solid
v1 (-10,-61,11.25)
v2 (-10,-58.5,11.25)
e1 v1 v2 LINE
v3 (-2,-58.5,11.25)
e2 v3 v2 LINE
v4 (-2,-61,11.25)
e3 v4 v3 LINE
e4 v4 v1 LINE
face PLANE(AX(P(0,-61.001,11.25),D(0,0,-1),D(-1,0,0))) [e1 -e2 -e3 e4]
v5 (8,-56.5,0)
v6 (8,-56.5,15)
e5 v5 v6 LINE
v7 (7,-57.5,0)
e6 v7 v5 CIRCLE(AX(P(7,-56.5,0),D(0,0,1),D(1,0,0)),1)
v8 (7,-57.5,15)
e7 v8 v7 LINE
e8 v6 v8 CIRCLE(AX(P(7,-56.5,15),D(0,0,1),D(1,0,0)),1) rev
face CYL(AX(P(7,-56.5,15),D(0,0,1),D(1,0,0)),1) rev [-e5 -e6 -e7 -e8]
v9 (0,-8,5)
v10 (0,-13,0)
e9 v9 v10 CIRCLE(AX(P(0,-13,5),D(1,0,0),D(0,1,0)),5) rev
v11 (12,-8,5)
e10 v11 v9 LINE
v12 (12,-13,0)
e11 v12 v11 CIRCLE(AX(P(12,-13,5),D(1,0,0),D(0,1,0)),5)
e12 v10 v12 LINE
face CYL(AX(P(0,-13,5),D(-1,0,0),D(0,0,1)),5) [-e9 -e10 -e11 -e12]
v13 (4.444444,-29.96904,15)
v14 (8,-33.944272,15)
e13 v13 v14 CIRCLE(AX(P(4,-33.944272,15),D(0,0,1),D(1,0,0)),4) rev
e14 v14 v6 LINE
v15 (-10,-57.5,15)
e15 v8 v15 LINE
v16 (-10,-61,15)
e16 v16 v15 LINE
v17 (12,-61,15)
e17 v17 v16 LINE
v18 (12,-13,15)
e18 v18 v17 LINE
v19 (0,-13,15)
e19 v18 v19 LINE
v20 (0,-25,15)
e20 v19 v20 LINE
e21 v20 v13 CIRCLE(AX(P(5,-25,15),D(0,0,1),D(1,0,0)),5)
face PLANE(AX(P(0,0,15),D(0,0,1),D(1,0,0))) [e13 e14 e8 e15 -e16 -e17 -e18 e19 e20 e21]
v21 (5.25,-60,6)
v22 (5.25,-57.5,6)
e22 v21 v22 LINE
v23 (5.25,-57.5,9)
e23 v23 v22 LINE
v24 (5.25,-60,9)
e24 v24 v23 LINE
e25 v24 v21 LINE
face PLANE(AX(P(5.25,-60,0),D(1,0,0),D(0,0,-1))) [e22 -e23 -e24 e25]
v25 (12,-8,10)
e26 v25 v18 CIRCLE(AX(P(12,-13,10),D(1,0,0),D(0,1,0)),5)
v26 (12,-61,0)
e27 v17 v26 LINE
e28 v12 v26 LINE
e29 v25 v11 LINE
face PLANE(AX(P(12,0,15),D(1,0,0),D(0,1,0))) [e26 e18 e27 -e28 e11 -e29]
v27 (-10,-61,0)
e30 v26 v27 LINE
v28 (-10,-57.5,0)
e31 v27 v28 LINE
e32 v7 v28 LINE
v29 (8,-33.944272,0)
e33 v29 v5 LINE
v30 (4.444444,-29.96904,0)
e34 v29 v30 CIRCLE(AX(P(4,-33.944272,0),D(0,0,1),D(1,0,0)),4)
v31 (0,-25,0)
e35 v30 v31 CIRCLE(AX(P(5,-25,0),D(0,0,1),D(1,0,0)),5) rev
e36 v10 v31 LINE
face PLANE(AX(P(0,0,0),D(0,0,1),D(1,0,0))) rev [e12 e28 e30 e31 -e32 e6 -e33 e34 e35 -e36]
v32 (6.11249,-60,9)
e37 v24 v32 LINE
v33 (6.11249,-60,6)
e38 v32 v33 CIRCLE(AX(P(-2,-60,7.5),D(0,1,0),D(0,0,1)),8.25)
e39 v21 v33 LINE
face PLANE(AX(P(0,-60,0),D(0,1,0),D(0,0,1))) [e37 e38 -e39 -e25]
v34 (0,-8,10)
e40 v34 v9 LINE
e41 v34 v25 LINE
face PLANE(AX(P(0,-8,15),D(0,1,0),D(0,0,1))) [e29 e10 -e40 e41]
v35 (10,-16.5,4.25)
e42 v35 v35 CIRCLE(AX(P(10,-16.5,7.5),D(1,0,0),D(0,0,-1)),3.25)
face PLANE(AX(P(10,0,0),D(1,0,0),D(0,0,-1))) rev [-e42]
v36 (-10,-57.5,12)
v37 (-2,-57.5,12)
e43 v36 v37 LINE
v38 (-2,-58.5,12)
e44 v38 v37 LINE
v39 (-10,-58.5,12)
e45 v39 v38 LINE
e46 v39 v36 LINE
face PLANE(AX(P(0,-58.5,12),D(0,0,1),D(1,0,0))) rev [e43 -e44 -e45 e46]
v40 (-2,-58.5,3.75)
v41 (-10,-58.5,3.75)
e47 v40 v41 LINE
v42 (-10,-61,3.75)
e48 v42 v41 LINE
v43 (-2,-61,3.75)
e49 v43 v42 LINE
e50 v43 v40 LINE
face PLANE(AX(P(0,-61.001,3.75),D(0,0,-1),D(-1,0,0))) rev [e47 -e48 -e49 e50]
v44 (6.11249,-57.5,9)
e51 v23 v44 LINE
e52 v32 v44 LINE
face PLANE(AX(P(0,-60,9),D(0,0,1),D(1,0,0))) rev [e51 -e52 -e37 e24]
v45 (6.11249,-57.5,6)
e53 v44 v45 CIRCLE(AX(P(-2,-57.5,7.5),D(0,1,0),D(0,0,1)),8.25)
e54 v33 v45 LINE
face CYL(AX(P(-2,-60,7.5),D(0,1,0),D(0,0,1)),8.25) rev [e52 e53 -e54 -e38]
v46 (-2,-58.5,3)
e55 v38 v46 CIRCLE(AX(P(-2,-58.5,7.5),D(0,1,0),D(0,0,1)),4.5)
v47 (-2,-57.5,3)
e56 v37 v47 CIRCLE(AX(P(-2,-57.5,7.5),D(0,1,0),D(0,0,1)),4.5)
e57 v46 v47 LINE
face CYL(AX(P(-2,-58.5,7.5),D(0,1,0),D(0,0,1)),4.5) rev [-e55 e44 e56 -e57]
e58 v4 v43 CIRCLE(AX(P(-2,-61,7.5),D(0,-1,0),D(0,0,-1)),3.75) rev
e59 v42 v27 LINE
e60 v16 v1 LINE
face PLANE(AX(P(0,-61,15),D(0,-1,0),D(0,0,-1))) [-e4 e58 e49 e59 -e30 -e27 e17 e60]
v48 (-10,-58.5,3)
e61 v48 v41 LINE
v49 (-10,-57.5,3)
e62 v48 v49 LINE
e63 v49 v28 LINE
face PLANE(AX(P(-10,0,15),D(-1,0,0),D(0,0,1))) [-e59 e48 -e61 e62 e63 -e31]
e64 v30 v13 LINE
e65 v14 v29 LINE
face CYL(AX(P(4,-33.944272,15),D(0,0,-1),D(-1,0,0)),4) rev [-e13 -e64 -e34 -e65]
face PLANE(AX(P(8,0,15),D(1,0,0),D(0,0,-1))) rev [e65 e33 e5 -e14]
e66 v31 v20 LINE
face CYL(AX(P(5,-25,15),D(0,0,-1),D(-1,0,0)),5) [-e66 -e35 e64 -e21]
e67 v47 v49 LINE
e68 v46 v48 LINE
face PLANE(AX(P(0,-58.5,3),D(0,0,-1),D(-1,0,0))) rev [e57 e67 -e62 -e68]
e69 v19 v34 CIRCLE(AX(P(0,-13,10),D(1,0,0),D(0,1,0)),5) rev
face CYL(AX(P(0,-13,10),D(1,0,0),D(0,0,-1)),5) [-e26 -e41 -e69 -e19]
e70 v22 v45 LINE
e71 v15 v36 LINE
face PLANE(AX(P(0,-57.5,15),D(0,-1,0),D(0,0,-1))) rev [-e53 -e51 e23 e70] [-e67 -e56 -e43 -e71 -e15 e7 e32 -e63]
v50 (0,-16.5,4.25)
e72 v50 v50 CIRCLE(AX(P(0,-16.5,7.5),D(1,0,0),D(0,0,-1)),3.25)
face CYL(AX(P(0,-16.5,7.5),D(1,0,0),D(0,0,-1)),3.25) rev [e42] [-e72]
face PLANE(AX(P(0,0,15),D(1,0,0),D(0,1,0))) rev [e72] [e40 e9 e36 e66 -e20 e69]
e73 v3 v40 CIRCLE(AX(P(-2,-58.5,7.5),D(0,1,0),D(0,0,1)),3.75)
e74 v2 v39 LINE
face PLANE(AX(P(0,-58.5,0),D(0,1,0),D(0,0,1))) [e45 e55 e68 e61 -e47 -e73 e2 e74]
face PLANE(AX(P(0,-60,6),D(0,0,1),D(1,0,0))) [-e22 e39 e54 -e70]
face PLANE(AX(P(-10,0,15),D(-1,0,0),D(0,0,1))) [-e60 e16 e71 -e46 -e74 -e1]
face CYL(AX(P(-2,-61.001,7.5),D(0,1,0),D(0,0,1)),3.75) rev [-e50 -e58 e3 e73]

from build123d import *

# Parameters (mm, degrees)
BOSS_EXTRUDE1_DEPTH    = 15
CUT_EXTRUDE1_OUTLINE_R = 3.25
CUT_EXTRUDE1_DEPTH     = 10
CUT_EXTRUDE2_DEPTH     = 1
CUT_EXTRUDE3_REACH     = 56.03
SKETCH5_W              = 8
SKETCH5_H              = 7.5
CUT_EXTRUDE4_DEPTH     = 2.5
FILLET1_R              = 5
FILLET2_R              = 4
FILLET4_R              = 5
FILLET5_R              = 1


# Read off the part's stored shape, not the designer's step: Cut-Extrude1
with BuildPart() as part:
    # Sketch1 → Boss-Extrude1 (new body)
    with BuildSketch(Plane.XY):
        Polygon((0, -8), (0, -30), (8, -30), (8, -57.5), (-10, -57.5), (-10, -61), (12, -61), (12, -8), align=None)
    extrude(amount=BOSS_EXTRUDE1_DEPTH)

    # Cut-Extrude1 outline → Cut-Extrude1 (cut)
    with BuildSketch(Plane.YZ):
        with Locations((-16.5, 7.5)):
            Circle(CUT_EXTRUDE1_OUTLINE_R)
    extrude(amount=CUT_EXTRUDE1_DEPTH, mode=Mode.SUBTRACT)

    # Sketch4 → Cut-Extrude2 (cut)
    with BuildSketch(Plane(origin=(0, -57.5, 0), x_dir=(1, 0, 0), z_dir=(0, 1, 0))):
        with BuildLine():
            Line((-2, -3), (-10, -3))
            Line((-10, -3), (-10, -12))
            Line((-10, -12), (-2, -12))
            ThreePointArc((-2, -12), (2.5, -7.5), (-2, -3))
        make_face()
    extrude(amount=-CUT_EXTRUDE2_DEPTH, mode=Mode.SUBTRACT)

    # Sketch5 → Cut-Extrude3 (cut, up to next)
    with BuildSketch(Plane(origin=(0, -58.5, 0), x_dir=(1, 0, 0), z_dir=(0, 1, 0)), mode=Mode.PRIVATE) as cut_extrude3_sk1:
        with BuildLine():
            ThreePointArc((-2, -11.25), (1.75, -7.5), (-2, -3.75))
            Line((-2, -3.75), (-2, -11.25))
        make_face()
    cut_extrude3_tool1 = extrude(cut_extrude3_sk1.sketch, amount=-CUT_EXTRUDE3_REACH, mode=Mode.PRIVATE) & part.part
    # Sketch5 → Cut-Extrude3 (cut, up to next)
    with BuildSketch(Plane(origin=(0, -58.5, 0), x_dir=(1, 0, 0), z_dir=(0, 1, 0)), mode=Mode.PRIVATE) as cut_extrude3_sk2:
        with Locations((-6, -7.5)):
            Rectangle(SKETCH5_W, SKETCH5_H)
    cut_extrude3_tool2 = extrude(cut_extrude3_sk2.sketch, amount=-CUT_EXTRUDE3_REACH, mode=Mode.PRIVATE) & part.part
    add(cut_extrude3_tool1.solids().sort_by_distance((-0.408451, -58.5, 7.5))[0], mode=Mode.SUBTRACT)
    add(cut_extrude3_tool2.solids().sort_by_distance((-6, -58.5, 7.5))[0], mode=Mode.SUBTRACT)

    # Sketch6 → Cut-Extrude4 (cut)
    with BuildSketch(Plane(origin=(0, -57.5, 0), x_dir=(1, 0, 0), z_dir=(0, 1, 0))):
        with BuildLine():
            Line((5.25, -7.5), (6.25, -7.5))
            ThreePointArc((6.25, -7.5), (6.215550668, -6.74685511), (6.11249037, -6))
            Line((6.11249037, -6), (5.25, -6))
            Line((5.25, -6), (5.25, -7.5))
        make_face()
        with BuildLine():
            ThreePointArc((6.11249037, -9), (6.215550668, -8.25314489), (6.25, -7.5))
            Line((6.25, -7.5), (5.25, -7.5))
            Line((5.25, -7.5), (5.25, -9))
            Line((5.25, -9), (6.11249037, -9))
        make_face()
    extrude(amount=-CUT_EXTRUDE4_DEPTH, mode=Mode.SUBTRACT)

    # Fillet1
    fillet1_edges = [part.edges().sort_by_distance(p)[0] for p in [
        (0, -30, 7.5),
    ]]
    fillet(fillet1_edges, radius=FILLET1_R)

    # Fillet2
    fillet2_edges = [part.edges().sort_by_distance(p)[0] for p in [
        (8, -30, 7.5),
    ]]
    fillet(fillet2_edges, radius=FILLET2_R)

    # Fillet4
    fillet4_edges = [part.edges().sort_by_distance(p)[0] for p in [
        (6, -8, 0),
        (6, -8, 15),
    ]]
    fillet(fillet4_edges, radius=FILLET4_R)

    # Fillet5
    fillet5_edges = [part.edges().sort_by_distance(p)[0] for p in [
        (8, -57.5, 7.5),
    ]]
    fillet(fillet5_edges, radius=FILLET5_R)


solid = part.part
